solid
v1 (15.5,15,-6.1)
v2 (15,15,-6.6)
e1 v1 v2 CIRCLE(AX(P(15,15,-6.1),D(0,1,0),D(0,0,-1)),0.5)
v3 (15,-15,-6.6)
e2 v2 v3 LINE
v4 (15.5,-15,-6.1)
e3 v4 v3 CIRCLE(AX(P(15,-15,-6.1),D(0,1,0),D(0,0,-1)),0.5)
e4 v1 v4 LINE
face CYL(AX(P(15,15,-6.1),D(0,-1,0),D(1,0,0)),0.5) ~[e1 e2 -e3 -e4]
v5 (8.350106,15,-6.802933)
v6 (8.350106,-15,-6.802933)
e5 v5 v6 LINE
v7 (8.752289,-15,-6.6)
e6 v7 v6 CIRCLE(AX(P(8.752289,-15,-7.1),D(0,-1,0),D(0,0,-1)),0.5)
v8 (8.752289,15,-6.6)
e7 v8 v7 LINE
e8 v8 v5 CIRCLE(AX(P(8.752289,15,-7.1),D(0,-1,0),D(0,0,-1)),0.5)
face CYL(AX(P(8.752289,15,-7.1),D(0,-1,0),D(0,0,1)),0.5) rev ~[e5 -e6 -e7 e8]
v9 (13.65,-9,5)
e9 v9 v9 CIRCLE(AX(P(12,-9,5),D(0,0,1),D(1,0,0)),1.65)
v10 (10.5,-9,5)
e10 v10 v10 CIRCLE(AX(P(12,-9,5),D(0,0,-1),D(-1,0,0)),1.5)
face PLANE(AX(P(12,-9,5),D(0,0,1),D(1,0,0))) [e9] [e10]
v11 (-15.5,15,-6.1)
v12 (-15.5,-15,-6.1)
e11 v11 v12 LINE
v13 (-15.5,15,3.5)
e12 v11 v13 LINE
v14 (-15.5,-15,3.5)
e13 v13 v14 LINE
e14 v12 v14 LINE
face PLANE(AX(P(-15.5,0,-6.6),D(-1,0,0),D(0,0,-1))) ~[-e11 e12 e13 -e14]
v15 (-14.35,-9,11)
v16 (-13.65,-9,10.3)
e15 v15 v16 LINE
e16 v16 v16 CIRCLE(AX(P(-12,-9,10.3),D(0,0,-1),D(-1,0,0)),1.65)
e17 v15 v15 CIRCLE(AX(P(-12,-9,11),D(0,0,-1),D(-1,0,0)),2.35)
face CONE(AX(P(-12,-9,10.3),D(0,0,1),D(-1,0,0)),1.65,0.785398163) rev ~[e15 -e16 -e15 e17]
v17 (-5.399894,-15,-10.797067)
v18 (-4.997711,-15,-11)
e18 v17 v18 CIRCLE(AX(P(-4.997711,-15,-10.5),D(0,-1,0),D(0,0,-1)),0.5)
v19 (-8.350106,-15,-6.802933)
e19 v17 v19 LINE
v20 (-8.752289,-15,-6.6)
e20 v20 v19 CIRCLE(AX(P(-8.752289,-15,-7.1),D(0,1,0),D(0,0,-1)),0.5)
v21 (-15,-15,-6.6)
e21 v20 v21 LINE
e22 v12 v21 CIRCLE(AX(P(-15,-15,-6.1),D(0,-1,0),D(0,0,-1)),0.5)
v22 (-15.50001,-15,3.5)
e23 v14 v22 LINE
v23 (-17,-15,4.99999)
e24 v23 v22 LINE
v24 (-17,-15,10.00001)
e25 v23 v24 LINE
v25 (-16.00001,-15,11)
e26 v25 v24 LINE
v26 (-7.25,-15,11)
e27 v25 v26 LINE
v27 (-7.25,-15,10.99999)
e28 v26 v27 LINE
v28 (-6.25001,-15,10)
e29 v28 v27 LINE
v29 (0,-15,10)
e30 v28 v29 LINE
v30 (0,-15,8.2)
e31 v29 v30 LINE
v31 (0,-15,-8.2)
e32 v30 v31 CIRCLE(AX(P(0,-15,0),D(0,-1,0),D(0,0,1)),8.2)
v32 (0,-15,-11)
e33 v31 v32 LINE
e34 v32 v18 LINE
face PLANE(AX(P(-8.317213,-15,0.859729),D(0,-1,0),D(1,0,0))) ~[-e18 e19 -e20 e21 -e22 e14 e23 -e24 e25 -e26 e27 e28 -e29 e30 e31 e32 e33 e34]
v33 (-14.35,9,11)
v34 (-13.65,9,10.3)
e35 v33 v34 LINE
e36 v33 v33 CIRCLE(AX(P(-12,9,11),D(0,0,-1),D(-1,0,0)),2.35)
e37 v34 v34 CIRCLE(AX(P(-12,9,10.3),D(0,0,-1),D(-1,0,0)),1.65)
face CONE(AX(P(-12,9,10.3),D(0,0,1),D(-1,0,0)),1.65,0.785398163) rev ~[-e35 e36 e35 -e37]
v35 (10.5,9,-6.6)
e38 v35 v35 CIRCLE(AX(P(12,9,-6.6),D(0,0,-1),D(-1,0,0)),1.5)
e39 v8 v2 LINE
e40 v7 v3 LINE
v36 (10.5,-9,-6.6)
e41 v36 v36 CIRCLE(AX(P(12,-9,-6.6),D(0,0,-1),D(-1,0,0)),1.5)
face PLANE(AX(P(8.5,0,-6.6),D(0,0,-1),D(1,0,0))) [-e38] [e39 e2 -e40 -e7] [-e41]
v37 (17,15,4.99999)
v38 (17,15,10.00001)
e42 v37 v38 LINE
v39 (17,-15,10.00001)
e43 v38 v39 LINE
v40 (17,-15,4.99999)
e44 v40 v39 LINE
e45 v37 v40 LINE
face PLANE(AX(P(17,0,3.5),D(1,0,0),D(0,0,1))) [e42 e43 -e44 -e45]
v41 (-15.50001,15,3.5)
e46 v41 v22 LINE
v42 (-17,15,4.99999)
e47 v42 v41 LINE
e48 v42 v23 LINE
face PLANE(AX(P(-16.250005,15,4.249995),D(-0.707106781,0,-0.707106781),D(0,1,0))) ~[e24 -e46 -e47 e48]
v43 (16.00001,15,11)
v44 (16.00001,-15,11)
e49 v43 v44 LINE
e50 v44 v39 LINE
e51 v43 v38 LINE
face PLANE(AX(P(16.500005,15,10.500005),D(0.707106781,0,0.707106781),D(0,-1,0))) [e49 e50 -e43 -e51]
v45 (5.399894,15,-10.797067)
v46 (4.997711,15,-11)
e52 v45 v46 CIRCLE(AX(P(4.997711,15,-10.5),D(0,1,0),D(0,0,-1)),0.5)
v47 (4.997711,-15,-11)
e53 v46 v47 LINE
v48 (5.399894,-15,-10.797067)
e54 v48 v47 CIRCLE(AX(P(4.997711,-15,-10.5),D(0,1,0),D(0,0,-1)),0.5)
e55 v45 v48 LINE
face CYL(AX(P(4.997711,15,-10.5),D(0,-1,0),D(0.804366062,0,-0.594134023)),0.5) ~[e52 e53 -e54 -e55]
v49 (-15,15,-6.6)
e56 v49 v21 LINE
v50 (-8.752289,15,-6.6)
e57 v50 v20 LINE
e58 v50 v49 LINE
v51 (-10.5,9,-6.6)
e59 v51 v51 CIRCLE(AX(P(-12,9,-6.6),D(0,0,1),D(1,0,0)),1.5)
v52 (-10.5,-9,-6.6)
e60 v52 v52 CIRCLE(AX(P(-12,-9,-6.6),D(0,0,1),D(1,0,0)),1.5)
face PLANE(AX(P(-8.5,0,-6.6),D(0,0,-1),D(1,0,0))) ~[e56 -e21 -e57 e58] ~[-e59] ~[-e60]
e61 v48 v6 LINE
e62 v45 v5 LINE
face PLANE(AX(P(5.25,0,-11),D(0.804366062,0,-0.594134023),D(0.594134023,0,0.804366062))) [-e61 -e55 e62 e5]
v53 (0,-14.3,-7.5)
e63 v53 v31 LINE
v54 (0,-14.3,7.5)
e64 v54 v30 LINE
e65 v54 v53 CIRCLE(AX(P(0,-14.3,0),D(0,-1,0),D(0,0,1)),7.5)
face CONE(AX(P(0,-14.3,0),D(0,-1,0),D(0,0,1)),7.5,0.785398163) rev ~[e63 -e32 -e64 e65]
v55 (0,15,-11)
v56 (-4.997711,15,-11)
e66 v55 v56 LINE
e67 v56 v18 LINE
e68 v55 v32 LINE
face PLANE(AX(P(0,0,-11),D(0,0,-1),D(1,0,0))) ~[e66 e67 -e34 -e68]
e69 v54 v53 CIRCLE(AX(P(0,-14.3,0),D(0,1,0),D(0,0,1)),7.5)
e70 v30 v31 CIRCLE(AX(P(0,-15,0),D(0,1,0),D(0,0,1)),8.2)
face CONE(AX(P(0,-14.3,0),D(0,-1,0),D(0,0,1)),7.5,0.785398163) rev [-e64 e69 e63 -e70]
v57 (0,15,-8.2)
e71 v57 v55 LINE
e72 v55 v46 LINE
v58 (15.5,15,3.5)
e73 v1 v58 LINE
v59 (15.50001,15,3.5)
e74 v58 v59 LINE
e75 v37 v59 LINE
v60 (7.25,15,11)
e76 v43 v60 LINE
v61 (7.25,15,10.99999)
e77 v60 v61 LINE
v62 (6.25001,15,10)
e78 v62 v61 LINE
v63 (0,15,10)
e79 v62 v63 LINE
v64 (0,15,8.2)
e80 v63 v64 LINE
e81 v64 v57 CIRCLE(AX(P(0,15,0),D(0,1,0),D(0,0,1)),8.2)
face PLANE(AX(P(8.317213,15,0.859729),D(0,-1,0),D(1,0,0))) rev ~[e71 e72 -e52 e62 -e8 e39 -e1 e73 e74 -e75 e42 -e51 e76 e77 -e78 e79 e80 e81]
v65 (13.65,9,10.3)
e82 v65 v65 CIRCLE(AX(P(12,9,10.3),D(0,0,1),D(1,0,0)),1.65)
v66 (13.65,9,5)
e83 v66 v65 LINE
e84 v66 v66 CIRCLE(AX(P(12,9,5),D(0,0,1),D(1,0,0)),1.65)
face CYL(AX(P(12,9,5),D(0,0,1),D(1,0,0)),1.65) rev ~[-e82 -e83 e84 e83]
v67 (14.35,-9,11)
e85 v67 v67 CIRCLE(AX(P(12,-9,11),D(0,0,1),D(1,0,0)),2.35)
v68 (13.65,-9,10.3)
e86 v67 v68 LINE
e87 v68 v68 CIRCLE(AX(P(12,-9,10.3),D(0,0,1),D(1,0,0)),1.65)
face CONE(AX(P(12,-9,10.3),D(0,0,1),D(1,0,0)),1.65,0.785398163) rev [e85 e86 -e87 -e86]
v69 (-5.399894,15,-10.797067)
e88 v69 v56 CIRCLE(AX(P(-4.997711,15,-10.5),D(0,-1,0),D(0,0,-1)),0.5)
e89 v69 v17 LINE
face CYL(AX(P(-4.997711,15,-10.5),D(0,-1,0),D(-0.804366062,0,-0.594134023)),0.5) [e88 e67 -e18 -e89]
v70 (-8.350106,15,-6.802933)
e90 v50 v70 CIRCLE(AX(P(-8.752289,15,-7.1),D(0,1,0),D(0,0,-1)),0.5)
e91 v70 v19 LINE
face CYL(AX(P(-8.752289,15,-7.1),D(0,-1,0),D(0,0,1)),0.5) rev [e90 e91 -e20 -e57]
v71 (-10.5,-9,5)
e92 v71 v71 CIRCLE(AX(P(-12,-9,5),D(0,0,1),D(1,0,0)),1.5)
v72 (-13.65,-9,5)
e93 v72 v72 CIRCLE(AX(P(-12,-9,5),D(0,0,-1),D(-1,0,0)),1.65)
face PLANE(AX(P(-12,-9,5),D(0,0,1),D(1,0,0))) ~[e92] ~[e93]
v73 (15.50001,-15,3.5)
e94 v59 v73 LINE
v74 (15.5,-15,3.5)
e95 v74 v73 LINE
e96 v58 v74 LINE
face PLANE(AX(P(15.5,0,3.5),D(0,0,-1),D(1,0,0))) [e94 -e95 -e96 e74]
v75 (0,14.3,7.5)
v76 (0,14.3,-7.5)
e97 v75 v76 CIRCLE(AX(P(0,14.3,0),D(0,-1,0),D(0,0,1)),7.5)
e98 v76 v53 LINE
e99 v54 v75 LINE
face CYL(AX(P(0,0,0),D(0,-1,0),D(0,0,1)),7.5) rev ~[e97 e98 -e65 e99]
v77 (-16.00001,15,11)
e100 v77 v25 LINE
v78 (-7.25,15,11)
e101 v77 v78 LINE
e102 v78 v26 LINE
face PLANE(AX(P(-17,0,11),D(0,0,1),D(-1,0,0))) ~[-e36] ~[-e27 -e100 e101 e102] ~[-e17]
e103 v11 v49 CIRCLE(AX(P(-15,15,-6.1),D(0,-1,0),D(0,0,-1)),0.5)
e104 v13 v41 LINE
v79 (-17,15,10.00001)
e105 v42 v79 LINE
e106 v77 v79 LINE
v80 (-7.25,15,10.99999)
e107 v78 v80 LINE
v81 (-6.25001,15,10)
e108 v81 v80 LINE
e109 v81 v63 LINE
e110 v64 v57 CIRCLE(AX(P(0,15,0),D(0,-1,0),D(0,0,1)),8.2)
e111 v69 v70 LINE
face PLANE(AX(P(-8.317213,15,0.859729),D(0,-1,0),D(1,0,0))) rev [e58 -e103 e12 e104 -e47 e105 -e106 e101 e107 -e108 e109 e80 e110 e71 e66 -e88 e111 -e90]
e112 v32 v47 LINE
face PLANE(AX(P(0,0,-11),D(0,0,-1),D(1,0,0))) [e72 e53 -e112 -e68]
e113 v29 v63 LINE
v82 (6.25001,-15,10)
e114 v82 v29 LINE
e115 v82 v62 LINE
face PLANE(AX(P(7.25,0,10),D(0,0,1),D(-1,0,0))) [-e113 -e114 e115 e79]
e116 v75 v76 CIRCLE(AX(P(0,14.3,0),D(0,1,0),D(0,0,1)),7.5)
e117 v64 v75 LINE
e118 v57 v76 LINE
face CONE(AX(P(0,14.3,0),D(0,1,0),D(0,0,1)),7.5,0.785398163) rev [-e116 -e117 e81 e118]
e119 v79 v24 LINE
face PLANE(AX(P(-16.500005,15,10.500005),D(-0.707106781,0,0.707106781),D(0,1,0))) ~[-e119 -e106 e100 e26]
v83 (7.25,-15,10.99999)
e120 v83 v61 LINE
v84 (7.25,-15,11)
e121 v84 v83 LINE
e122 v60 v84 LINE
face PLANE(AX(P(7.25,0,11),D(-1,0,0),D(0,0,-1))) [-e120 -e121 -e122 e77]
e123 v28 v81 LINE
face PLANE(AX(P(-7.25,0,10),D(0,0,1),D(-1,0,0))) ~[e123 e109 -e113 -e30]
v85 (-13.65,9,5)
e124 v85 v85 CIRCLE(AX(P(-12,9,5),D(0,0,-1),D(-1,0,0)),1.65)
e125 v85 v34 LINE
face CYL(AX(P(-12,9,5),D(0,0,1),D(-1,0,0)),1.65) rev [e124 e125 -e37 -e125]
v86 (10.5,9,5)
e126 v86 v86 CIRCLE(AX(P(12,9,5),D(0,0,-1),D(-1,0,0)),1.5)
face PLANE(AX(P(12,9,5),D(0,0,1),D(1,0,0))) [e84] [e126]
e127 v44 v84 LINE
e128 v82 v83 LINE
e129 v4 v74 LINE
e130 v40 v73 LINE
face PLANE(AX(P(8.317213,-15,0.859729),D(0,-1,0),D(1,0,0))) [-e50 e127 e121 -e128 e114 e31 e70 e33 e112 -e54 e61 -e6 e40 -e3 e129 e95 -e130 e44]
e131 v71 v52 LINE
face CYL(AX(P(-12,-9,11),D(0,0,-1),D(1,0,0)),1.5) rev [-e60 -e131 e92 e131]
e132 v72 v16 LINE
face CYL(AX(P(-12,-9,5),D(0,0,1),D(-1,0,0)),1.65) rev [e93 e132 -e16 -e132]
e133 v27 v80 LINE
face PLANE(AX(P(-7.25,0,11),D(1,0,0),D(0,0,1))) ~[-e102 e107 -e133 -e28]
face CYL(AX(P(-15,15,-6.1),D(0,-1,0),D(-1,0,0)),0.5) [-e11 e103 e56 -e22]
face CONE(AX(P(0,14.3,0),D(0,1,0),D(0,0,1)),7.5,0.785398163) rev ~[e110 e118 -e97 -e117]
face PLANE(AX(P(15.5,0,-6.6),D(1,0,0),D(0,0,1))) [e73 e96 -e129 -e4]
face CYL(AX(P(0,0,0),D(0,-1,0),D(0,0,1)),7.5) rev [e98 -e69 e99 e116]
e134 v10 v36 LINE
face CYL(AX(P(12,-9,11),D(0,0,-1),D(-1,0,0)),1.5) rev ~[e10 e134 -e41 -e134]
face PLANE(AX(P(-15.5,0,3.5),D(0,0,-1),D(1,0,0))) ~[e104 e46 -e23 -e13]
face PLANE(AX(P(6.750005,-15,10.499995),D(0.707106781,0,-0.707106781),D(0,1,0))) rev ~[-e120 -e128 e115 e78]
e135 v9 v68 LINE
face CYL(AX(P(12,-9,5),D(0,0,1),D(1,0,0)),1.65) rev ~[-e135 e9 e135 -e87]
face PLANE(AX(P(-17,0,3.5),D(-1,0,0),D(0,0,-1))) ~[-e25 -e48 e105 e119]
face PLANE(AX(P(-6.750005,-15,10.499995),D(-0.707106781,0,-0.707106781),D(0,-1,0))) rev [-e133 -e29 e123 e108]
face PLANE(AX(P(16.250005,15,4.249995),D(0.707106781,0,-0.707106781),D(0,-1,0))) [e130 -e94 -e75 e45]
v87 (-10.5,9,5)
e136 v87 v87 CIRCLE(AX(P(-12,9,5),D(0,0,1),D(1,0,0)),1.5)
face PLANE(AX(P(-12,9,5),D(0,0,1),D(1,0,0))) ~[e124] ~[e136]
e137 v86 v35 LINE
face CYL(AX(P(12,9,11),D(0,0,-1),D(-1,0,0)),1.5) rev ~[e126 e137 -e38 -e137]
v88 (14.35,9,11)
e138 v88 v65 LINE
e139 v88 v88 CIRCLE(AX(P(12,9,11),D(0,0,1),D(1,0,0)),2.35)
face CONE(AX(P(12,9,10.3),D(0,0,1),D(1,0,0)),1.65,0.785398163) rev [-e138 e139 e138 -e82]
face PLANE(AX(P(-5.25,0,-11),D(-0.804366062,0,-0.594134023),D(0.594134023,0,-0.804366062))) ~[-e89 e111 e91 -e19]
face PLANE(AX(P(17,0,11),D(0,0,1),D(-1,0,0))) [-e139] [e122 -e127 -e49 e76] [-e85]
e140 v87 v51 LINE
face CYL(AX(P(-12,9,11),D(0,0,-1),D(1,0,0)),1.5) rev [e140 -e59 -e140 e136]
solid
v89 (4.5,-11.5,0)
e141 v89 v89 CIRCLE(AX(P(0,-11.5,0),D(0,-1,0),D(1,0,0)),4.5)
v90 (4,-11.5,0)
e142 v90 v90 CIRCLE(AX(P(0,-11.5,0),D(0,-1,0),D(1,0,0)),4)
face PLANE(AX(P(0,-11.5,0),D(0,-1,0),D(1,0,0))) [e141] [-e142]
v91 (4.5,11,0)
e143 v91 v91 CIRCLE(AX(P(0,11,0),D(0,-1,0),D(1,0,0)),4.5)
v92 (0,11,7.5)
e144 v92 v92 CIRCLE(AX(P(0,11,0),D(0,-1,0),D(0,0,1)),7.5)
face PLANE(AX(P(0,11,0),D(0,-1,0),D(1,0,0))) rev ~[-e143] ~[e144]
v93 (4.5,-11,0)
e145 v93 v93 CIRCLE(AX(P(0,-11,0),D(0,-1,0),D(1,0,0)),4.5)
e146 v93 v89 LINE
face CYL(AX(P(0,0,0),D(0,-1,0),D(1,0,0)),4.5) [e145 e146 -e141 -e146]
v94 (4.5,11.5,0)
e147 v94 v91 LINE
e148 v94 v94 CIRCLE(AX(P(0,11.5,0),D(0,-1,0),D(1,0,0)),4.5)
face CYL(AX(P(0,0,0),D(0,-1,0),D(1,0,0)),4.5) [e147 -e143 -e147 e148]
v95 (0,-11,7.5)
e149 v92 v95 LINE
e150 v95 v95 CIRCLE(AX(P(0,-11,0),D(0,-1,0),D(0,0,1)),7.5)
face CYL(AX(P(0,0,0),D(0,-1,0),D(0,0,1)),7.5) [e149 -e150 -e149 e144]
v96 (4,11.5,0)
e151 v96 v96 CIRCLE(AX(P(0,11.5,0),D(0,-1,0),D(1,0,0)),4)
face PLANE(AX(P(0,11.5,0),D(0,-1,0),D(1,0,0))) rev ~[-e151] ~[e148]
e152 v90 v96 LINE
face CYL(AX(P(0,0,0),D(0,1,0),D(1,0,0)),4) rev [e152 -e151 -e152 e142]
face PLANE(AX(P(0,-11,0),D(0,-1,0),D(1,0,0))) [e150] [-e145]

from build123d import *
from build123d import SkipClean  # not in build123d's __all__

# Parameters (mm, degrees)
F1_DEPTH       = 15
F2_SIZE        = 0.99999
F3_SIZE        = 1.49999
F4_R           = 0.5
F6_D           = 3
F6_CBORE_D     = 3.3
F6_CBORE_DEPTH = 6
F7_SIZE        = 0.7
F0_R           = 4.5
F8_DEPTH       = 11
F0_R_2         = 4
F9_DEPTH       = 11.5


# Not quite as in the source:
# - a fillet or chamfer is up to 0.001 mm smaller than in the source, because OpenCascade refuses the exact size


with BuildPart() as f1:
    # F0 (on Front) → F1 (new body, symmetric)
    with BuildSketch(Plane.XZ):
        with BuildLine():
            ThreePointArc((0, 7.5), (5.3033008589, 5.3033008589), (7.5, 0))
            ThreePointArc((7.5, 0), (5.3033008589, -5.3033008589), (0, -7.5))
            Line((0, -7.5), (0, -11))
            Line((0, -11), (5.25, -11))
            Line((5.25, -11), (8.5, -6.6))
            Line((8.5, -6.6), (15.5, -6.6))
            Line((15.5, -6.6), (15.5, 3.5))
            Line((15.5, 3.5), (17, 3.5))
            Line((17, 3.5), (17, 11))
            Line((17, 11), (7.25, 11))
            Line((7.25, 11), (7.25, 10))
            Line((7.25, 10), (0, 10))
            Line((0, 10), (0, 7.5))
        make_face()
    extrude(amount=F1_DEPTH, both=True)

    # F2 (size 1 in the source; OpenCascade refuses exactly that, so slightly less here)
    f2_edges = [f1.edges().sort_by_distance(p)[0] for p in [
        (7.25, 0, 10),
        (17, 0, 11),
    ]]
    chamfer(f2_edges, length=F2_SIZE)

    # F3 (size 1.5 in the source; OpenCascade refuses exactly that, so slightly less here)
    f3_edges = [f1.edges().sort_by_distance(p)[0] for p in [
        (17, 0, 3.5),
    ]]
    chamfer(f3_edges, length=F3_SIZE)

    # F4
    f4_edges = [f1.edges().sort_by_distance(p)[0] for p in [
        (15.5, 0, -6.6),
        (8.5, 0, -6.6),
        (5.25, 0, -11),
    ]]
    fillet(f4_edges, radius=F4_R)

    # F6 (through all)
    with Locations(Plane.XY.offset(11)):
        with Locations((12, 9), (12, -9)):
            CounterBoreHole(F6_D / 2, F6_CBORE_D / 2, F6_CBORE_DEPTH)

    # F7
    f7_edges = [f1.edges().sort_by_distance(p)[0] for p in [
        (7.5, -15, 0),
        (7.5, 15, 0),
        (10.35, 9, 11),
        (10.35, -9, 11),
    ]]
    chamfer(f7_edges, length=F7_SIZE)

    # F10: F1 across plane


with BuildPart() as f8:
    # F0 (on Front) → F8 (new body, symmetric)
    with BuildSketch(Plane.XZ):
        with BuildLine():
            ThreePointArc((0, -7.5), (5.3033008589, -5.3033008589), (7.5, 0))
            ThreePointArc((7.5, 0), (5.3033008589, 5.3033008589), (0, 7.5))
            ThreePointArc((0, 7.5), (-7.5, 0), (0, -7.5))
        make_face()
        Circle(F0_R, mode=Mode.SUBTRACT)
    extrude(amount=F8_DEPTH, both=True)

    # F0 (on Front) → F9 (join, symmetric)
    with BuildSketch(Plane.XZ):
        Circle(F0_R)
        Circle(F0_R_2, mode=Mode.SUBTRACT)
    extrude(amount=F9_DEPTH, both=True)


with BuildPart() as f1_1:
    add(f1.part, clean=False)
    with SkipClean():  # cleaning this boolean's faces spoils the solid; the shape is the same uncleaned
        add(f1.part.mirror(Plane.YZ), clean=False)


solid = Compound([f8.part, f1_1.part])
